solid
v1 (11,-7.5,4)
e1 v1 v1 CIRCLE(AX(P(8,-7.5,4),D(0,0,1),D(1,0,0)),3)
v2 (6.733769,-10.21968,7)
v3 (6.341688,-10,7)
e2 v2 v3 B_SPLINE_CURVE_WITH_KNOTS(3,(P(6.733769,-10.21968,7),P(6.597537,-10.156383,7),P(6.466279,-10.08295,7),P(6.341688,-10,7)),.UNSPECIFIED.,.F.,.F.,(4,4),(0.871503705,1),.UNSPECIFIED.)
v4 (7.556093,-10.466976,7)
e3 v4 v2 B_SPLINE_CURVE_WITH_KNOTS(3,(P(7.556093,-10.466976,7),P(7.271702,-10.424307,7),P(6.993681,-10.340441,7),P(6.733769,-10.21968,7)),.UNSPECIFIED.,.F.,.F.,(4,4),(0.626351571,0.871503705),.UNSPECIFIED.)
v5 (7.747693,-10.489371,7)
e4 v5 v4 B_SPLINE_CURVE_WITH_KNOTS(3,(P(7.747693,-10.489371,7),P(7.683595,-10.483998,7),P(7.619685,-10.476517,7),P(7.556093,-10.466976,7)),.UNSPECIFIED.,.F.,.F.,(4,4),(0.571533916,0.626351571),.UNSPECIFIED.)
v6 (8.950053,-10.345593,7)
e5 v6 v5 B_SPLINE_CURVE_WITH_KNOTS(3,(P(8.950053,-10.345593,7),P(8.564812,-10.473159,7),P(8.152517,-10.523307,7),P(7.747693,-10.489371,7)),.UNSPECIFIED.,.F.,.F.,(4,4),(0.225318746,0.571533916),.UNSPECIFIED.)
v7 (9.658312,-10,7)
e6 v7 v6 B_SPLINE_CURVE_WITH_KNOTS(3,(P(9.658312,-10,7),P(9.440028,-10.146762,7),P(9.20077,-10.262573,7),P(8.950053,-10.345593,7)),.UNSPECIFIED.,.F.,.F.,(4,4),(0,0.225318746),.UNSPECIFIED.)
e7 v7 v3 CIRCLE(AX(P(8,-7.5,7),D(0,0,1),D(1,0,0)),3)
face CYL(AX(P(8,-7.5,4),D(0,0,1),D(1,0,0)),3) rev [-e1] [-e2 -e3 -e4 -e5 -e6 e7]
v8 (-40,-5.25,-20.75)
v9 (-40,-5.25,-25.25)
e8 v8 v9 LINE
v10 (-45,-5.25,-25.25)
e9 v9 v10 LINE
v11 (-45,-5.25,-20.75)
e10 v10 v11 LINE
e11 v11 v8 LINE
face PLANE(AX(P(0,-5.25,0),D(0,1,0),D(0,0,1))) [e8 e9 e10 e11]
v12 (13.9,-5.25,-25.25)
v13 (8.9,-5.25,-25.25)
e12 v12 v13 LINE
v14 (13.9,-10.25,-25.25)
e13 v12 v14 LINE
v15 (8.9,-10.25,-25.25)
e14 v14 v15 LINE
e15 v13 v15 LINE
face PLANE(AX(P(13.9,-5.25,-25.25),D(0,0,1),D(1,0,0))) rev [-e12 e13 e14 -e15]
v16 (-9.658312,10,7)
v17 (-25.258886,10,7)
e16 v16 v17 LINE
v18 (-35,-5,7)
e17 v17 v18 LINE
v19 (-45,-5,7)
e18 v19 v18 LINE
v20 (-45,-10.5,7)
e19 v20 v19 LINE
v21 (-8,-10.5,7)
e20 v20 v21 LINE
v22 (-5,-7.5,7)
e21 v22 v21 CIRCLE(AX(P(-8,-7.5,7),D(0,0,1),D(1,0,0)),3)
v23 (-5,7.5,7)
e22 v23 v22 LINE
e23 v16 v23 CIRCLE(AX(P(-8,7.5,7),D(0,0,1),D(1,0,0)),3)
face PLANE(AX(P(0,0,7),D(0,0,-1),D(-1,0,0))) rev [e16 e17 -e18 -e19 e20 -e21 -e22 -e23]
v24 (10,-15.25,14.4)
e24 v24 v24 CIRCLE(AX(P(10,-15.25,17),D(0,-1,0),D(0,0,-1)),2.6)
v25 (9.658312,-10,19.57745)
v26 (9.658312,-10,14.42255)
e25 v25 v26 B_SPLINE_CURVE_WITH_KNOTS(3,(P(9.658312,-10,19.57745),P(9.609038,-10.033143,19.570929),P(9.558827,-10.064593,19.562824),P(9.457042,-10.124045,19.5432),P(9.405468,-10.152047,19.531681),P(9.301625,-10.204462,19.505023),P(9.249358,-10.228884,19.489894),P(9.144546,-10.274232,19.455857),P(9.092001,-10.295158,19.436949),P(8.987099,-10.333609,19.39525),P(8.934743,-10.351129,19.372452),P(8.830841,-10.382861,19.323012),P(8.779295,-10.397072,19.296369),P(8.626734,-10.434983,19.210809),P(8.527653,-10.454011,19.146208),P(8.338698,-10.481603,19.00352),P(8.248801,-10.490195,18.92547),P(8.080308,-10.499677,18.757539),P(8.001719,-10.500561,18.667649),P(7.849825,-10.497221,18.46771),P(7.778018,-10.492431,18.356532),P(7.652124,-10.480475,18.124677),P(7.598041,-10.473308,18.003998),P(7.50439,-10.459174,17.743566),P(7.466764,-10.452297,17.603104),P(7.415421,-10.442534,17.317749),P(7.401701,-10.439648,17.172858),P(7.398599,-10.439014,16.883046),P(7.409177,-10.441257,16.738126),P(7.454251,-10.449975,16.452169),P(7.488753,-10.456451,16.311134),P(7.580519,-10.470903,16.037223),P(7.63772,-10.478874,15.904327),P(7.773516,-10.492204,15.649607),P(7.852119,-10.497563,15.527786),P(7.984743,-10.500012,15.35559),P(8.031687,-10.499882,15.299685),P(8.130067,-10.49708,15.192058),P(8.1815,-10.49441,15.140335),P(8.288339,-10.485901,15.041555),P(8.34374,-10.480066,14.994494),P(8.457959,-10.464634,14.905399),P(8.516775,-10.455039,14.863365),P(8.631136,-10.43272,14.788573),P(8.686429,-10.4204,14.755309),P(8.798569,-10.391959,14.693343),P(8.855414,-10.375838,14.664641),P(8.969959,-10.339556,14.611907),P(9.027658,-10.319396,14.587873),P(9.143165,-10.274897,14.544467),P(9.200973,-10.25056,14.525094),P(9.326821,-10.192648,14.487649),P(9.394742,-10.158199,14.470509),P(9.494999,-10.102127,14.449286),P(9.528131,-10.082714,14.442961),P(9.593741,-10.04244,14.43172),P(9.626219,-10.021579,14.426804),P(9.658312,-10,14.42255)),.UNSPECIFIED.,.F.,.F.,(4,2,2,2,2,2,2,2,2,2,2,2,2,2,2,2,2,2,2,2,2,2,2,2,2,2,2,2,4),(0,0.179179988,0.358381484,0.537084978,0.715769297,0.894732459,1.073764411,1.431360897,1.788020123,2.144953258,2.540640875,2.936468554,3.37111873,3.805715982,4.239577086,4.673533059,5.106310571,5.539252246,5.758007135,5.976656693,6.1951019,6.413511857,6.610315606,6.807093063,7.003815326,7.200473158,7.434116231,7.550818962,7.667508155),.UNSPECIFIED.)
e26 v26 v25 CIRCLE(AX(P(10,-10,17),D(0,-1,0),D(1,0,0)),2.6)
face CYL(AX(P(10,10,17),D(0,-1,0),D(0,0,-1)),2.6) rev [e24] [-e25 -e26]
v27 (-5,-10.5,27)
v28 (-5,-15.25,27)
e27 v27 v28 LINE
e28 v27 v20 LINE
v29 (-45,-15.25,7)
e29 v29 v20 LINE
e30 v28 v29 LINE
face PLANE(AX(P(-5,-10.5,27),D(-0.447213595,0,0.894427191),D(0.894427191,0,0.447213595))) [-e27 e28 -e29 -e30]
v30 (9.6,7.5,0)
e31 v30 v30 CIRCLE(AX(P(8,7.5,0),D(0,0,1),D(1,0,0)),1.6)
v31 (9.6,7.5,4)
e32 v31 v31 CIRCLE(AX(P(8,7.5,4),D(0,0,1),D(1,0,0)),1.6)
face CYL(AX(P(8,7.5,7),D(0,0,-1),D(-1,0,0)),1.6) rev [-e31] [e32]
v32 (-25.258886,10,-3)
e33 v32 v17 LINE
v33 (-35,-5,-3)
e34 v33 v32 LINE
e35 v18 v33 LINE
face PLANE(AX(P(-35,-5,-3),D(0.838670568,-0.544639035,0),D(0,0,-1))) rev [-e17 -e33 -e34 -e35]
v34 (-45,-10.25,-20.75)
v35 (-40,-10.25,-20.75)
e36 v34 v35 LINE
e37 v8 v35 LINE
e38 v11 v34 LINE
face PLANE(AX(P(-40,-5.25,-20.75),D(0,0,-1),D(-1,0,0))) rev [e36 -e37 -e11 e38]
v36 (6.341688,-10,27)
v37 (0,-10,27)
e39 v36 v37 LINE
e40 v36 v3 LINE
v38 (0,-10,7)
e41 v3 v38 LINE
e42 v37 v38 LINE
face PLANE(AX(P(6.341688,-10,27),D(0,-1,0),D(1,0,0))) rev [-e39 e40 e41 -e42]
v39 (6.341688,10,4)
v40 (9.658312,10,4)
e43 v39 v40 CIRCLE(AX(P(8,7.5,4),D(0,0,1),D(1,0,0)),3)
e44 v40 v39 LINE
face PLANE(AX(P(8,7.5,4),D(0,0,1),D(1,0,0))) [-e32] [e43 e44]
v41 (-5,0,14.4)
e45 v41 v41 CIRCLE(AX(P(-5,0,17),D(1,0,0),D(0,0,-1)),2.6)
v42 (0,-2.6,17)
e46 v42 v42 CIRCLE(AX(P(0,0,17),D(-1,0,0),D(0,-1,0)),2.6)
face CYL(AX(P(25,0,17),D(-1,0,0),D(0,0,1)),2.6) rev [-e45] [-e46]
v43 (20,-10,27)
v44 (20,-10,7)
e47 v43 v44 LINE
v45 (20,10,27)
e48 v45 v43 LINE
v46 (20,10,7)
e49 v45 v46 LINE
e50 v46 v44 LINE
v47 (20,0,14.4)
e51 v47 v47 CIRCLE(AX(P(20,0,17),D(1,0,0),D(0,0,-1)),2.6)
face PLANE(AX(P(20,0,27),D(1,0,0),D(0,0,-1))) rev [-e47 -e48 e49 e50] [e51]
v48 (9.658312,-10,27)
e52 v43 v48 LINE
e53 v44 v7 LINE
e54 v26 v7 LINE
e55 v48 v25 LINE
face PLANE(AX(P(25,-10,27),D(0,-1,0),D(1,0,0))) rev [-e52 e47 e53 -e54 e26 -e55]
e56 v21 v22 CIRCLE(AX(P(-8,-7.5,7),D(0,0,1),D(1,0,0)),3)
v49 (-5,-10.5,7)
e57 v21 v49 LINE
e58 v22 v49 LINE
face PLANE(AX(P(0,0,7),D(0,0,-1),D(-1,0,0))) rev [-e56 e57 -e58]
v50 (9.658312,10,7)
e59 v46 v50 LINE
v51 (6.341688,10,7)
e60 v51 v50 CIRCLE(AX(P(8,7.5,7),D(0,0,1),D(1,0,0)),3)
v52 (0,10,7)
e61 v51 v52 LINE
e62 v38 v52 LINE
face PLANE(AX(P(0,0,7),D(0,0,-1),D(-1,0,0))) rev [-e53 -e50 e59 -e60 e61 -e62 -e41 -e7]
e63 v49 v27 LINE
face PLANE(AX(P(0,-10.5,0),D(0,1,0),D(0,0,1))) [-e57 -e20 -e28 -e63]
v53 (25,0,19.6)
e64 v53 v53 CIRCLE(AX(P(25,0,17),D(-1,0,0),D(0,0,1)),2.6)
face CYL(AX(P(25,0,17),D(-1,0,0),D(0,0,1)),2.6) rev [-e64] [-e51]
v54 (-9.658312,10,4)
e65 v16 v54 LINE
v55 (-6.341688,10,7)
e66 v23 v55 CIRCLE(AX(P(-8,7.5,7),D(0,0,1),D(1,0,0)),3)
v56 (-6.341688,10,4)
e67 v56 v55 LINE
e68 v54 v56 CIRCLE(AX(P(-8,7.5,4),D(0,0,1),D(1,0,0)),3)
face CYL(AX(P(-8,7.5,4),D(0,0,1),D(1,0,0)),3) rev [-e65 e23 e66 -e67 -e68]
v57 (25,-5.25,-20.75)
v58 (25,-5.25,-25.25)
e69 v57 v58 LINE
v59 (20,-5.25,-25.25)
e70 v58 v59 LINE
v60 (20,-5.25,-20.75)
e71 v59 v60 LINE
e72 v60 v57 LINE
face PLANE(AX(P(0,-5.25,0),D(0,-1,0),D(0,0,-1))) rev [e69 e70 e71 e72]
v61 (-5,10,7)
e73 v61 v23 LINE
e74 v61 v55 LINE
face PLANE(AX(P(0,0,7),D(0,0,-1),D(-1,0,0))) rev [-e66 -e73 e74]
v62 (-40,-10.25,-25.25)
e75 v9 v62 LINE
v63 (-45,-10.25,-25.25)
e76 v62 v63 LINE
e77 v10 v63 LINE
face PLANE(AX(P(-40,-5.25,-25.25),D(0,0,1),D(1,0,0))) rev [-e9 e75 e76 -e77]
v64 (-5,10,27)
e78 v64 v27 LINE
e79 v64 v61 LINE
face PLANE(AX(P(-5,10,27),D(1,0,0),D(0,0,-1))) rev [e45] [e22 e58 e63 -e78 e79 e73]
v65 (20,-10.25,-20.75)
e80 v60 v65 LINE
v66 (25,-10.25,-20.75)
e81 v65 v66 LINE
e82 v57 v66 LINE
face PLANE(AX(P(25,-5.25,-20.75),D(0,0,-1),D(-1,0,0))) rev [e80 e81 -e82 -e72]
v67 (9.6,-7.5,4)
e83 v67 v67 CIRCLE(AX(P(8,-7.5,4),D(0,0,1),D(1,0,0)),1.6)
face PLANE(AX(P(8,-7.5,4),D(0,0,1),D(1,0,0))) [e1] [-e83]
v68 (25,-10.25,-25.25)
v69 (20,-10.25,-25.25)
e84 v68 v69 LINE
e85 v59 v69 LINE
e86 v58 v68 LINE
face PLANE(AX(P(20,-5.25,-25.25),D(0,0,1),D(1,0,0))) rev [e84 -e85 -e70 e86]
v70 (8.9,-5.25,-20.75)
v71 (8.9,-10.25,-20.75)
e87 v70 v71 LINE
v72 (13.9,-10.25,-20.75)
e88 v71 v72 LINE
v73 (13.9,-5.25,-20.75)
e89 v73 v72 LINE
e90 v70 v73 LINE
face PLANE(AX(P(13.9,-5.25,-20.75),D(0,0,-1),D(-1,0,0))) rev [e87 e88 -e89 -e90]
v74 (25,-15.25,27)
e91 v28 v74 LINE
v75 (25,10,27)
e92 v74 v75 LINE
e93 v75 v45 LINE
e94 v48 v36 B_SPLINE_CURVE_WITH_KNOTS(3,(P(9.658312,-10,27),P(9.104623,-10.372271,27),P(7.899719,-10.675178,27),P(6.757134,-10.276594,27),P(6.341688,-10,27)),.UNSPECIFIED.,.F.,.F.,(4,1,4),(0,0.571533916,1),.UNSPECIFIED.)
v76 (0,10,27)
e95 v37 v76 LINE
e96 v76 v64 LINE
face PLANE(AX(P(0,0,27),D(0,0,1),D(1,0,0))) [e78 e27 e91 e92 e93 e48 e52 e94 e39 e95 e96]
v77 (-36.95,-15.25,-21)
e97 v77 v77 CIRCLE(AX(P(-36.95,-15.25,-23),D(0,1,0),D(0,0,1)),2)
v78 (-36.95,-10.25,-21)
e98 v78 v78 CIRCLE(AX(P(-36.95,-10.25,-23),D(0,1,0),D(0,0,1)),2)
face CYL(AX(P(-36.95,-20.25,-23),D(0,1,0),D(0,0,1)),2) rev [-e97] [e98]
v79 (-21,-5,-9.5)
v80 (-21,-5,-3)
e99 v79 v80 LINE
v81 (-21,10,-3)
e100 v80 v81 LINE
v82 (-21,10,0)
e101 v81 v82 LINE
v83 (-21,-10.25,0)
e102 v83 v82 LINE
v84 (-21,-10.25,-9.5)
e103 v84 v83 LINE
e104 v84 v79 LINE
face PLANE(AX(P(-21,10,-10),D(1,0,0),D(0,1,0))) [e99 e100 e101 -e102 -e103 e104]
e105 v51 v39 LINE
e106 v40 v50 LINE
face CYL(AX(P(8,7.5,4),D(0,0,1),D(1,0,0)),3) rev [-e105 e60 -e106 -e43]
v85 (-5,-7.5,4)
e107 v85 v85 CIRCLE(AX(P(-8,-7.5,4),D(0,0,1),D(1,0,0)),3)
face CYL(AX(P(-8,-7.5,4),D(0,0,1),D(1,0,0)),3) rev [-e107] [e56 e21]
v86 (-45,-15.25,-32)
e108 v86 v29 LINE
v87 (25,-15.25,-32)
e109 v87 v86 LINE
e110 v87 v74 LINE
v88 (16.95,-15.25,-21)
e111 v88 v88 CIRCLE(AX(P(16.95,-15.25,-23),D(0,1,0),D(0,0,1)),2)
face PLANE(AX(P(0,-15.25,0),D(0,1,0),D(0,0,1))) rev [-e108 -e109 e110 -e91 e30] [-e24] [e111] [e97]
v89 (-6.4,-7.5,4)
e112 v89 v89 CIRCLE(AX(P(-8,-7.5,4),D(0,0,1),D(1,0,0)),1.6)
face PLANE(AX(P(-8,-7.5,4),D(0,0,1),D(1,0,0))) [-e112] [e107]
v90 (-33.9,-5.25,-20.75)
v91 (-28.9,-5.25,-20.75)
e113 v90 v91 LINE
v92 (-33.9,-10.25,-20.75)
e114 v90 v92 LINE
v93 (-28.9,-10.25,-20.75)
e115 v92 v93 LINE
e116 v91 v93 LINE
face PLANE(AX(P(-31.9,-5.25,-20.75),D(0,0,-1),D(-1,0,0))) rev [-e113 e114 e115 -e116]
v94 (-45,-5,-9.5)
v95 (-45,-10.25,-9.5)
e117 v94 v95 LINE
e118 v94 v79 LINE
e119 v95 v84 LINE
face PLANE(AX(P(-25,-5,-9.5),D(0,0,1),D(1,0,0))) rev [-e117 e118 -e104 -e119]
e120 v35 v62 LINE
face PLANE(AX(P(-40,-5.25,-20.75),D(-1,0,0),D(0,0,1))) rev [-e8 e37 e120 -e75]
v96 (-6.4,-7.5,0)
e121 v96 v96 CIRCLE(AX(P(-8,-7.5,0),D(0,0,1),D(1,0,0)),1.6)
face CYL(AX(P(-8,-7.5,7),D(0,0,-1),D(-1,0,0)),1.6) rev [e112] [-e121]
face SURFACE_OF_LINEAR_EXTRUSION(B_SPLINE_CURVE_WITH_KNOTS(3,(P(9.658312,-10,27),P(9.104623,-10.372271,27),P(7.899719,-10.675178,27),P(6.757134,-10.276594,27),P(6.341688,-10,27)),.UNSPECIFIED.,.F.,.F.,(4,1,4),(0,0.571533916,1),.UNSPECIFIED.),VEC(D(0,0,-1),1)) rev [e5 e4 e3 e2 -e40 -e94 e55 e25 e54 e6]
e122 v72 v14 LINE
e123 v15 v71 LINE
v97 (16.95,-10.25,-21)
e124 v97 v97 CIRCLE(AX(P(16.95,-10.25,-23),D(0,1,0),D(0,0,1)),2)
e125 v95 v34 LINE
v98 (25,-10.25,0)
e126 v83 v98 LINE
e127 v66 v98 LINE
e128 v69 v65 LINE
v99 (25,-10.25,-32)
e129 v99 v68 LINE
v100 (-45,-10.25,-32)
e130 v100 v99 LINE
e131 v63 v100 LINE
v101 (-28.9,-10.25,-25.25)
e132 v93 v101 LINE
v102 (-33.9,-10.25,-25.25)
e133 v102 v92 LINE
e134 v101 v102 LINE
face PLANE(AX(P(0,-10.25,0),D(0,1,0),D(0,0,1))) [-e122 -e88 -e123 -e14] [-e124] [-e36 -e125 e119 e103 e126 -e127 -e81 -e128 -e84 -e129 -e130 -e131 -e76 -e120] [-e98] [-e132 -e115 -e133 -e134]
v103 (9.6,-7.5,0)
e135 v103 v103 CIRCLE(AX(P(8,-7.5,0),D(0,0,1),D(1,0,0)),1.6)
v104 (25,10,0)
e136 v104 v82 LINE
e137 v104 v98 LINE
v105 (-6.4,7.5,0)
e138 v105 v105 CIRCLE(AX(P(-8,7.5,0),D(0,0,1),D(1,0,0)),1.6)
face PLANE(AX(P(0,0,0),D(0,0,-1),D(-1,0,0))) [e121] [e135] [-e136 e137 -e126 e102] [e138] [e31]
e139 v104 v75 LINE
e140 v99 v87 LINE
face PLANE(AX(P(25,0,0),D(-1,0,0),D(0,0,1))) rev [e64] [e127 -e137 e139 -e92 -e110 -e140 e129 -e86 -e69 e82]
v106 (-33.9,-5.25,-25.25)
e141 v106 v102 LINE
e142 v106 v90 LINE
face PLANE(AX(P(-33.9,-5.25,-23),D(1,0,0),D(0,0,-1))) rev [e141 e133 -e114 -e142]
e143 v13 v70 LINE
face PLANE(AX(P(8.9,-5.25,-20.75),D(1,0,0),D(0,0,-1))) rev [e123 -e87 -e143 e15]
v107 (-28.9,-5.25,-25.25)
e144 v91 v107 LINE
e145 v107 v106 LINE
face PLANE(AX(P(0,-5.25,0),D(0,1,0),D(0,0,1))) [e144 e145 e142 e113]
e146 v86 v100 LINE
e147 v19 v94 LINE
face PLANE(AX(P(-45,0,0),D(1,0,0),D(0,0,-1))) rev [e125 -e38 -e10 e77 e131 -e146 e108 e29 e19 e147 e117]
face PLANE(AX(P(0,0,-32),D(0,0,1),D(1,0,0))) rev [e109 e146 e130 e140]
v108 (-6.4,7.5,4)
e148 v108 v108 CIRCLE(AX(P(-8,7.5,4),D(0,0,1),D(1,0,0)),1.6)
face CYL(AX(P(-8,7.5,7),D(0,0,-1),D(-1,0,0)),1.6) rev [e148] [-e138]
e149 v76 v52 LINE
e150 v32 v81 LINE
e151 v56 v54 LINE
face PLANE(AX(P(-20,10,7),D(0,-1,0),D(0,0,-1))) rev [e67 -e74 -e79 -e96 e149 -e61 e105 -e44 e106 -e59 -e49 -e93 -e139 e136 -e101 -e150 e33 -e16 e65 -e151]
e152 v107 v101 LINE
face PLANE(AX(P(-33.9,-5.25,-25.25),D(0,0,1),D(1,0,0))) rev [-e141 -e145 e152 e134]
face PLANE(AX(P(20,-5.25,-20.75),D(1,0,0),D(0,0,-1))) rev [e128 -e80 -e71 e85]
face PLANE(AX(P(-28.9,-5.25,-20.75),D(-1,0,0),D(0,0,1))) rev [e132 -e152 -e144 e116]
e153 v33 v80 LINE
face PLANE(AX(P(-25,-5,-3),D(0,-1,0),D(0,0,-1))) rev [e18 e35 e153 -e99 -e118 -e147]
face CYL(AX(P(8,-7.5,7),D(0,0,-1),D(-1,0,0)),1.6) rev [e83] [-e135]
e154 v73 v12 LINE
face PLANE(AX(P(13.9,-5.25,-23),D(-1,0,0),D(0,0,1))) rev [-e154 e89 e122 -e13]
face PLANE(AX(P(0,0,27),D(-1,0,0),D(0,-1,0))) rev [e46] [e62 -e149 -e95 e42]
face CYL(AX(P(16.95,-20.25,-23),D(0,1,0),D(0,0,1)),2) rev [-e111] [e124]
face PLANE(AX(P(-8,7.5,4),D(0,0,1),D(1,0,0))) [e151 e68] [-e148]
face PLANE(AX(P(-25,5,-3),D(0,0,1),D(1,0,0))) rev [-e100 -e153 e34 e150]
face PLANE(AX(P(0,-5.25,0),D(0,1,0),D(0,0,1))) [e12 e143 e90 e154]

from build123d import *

# Parameters (mm, degrees)
SKETCH1_W            = 40
SKETCH1_H            = 20
SKETCH1_R            = 1.6
BOSS_EXTRUDE1_DEPTH  = 7
BOSS_EXTRUDE2_DEPTH  = 5
BOSS_EXTRUDE3_DEPTH  = 5
BOSS_EXTRUDE4_DEPTH  = 0.25
SKETCH5_W            = 50
SKETCH5_H            = 36
BOSS_EXTRUDE5_DEPTH  = 5
SKETCH6_R            = 3
CUT_EXTRUDE1_DEPTH   = 3
BOSS_EXTRUDE6_DEPTH  = 20
BOSS_EXTRUDE8_DEPTH  = 20
SKETCH10_R           = 2.6
CUT_EXTRUDE2_DEPTH   = 60.779281528
BOSS_EXTRUDE9_DEPTH  = 20
SKETCH12_R           = 2.6
CUT_EXTRUDE3_DEPTH   = 60.190898836
SKETCH13_W           = 5
SKETCH13_H           = 5
CUT_EXTRUDE4_DEPTH   = 6.5
CHAMFER1_SIZE        = 15.398649638
CHAMFER1_SIZE_2      = 10
SKETCH14_W           = 1
SKETCH14_H           = 20.25
CUT_EXTRUDE5_DEPTH   = 10
SKETCH16_W           = 4
SKETCH16_H           = 20.25
CUT_EXTRUDE7_DEPTH   = 10
BOSS_EXTRUDE10_DEPTH = 4.75
SKETCH18_W           = 70
SKETCH18_H           = 5
BOSS_EXTRUDE11_DEPTH = 3
BOSS_EXTRUDE7_DEPTH  = 5
SKETCH15_R           = 2
CUT_EXTRUDE6_DEPTH   = 10


with BuildPart() as part:
    # Sketch1 → Boss-Extrude1 (new body)
    with BuildSketch(Plane.XY):
        Rectangle(SKETCH1_W, SKETCH1_H)
        with Locations((-8, 7.5)):
            Circle(SKETCH1_R, mode=Mode.SUBTRACT)
        with Locations((8, 7.5)):
            Circle(SKETCH1_R, mode=Mode.SUBTRACT)
        with Locations((8, -7.5)):
            Circle(SKETCH1_R, mode=Mode.SUBTRACT)
        with Locations((-8, -7.5)):
            Circle(SKETCH1_R, mode=Mode.SUBTRACT)
    extrude(amount=BOSS_EXTRUDE1_DEPTH)

    # Sketch2 → Boss-Extrude2 (add)
    with BuildSketch(Plane(origin=(20, 0, 0), x_dir=(0, 0, -1), z_dir=(1, 0, 0))):
        Polygon((3, -5), (3, 5), (9.5, 5), (9.5, 10), (0, 10), (-7, 10), (-7, -10), (0, -10), (9.5, -10), (9.5, -5), align=None)
    extrude(amount=BOSS_EXTRUDE2_DEPTH)

    # Sketch3 → Boss-Extrude3 (add)
    with BuildSketch(Plane.ZY.offset(20)):
        Polygon((7, 10), (-9.5, 10), (-9.5, 5), (-3, 5), (-3, -5), (-9.5, -5), (-9.5, -10), (7, -10), align=None)
    extrude(amount=BOSS_EXTRUDE3_DEPTH)

    # Sketch4 → Boss-Extrude4 (add)
    with BuildSketch(Plane.XZ.offset(10)):
        Polygon((-25, 7), (-25, -9.5), (-20, -9.5), (-20, 0), (20, 0), (20, -9.5), (25, -9.5), (25, 7), align=None)
    extrude(amount=BOSS_EXTRUDE4_DEPTH)

    # Sketch5 → Boss-Extrude5 (add)
    with BuildSketch(Plane.XZ.offset(10.25)):
        with Locations((0, -11)):
            Rectangle(SKETCH5_W, SKETCH5_H)
    extrude(amount=BOSS_EXTRUDE5_DEPTH)

    # Sketch6 → Cut-Extrude1 (cut)
    with BuildSketch(Plane.XY.offset(7)):
        with Locations((-8, 7.5)):
            Circle(SKETCH6_R)
        with Locations((-8, -7.5)):
            Circle(SKETCH6_R)
        with Locations((8, -7.5)):
            Circle(SKETCH6_R)
        with Locations((8, 7.5)):
            Circle(SKETCH6_R)
    extrude(amount=-CUT_EXTRUDE1_DEPTH, mode=Mode.SUBTRACT)

    # Sketch7 → Boss-Extrude6 (add)
    with BuildSketch(Plane.ZY.offset(25)):
        Polygon((-3, -5), (7, -5), (7, -15.25), (-29, -15.25), (-29, -10.25), (-9.5, -10.25), (-9.5, -5), align=None)
    extrude(amount=BOSS_EXTRUDE6_DEPTH)

    # Sketch9 → Boss-Extrude8 (add)
    with BuildSketch(Plane.XY.offset(7)):
        Polygon((0, 0), (0, 10), (-5, 10), (-5, -10), (0, -10), align=None)
        Polygon((20, 0), (20, 10), (25, 10), (25, -10), (20, -10), align=None)
    extrude(amount=BOSS_EXTRUDE8_DEPTH)

    # Sketch10 → Cut-Extrude2 (cut, through all)
    with BuildSketch(Plane.ZY.offset(25)):
        with Locations(Location((17, 0, 0), (0, 0, 270))):
            Circle(SKETCH10_R)
    extrude(amount=-CUT_EXTRUDE2_DEPTH, mode=Mode.SUBTRACT)

    # Sketch11 → Boss-Extrude9 (add, through all)
    with BuildSketch(Plane.XY.offset(7)):
        with BuildLine():
            Line((25, -15.25), (25, -10))
            Line((25, -10), (10, -10))
            Line((10, -10), (9.658312395, -10))
            add(Edge.make_bspline(
                [(9.658312395, -10), (9.104622692, -10.372271133), (7.89971927, -10.67517784), (6.757134286, -10.276593696), (6.341687605, -10)],
                knots=[0, 0, 0, 0, 0.571533916, 1, 1, 1, 1], degree=3))
            Line((6.341687605, -10), (-5, -10))
            Line((-5, -10), (-5, -15.25))
            Line((-5, -15.25), (25, -15.25))
        make_face()
    extrude(amount=BOSS_EXTRUDE9_DEPTH)

    # Sketch12 → Cut-Extrude3 (cut, through all)
    with BuildSketch(Plane.XZ.offset(15.25)):
        with Locations(Location((10, 17, 0), (0, 0, 270))):
            Circle(SKETCH12_R)
    extrude(amount=-CUT_EXTRUDE3_DEPTH, mode=Mode.SUBTRACT)

    # Sketch13 → Cut-Extrude4 (cut)
    with BuildSketch(Plane(origin=(0, 0, -9.5), x_dir=(-1, 0, 0), z_dir=(0, 0, -1))):
        with Locations((22.5, 7.5)):
            Rectangle(SKETCH13_W, SKETCH13_H)
        with Locations((-22.5, 7.5)):
            Rectangle(SKETCH13_W, SKETCH13_H)
    extrude(amount=-CUT_EXTRUDE4_DEPTH, mode=Mode.SUBTRACT)

    # Chamfer1
    # the kernel refuses this chamfer: 15.398649638, 10 mm, written as the material it adds along each edge
    with BuildSketch(Plane(origin=(-25, -5, 7), x_dir=(0.021073765466273167, 0.9997779235455604, 0), z_dir=(0, 0, -1))) as chamfer1_piece_1_section:
        Polygon((CHAMFER1_SIZE * 0.999777923555, -CHAMFER1_SIZE * 0.0210737654665), (-CHAMFER1_SIZE_2 * 0.0210737654663, -CHAMFER1_SIZE_2 * 0.999777923546), (0, 0), align=None)
    chamfer1_piece_1 = extrude(amount=10, mode=Mode.PRIVATE)
    chamfer1_piece_1 = split(chamfer1_piece_1, bisect_by=Plane(origin=(-28.252881362, 10, 2), z_dir=(0, -1, 0)), keep=Keep.TOP, mode=Mode.PRIVATE)
    add(chamfer1_piece_1)

    # Sketch14 → Cut-Extrude5 (cut)
    with BuildSketch(Plane(origin=(0, 0, 0), x_dir=(-1, 0, 0), z_dir=(0, 0, -1))):
        with Locations((20.5, -0.125)):
            Rectangle(SKETCH14_W, SKETCH14_H)
        with Locations((-20.5, -0.125)):
            Rectangle(SKETCH14_W, SKETCH14_H)
    extrude(amount=CUT_EXTRUDE5_DEPTH, mode=Mode.SUBTRACT)

    # Sketch16 → Cut-Extrude7 (cut)
    with BuildSketch(Plane(origin=(0, 0, 0), x_dir=(-1, 0, 0), z_dir=(0, 0, -1))):
        with Locations((-23, -0.125)):
            Rectangle(SKETCH16_W, SKETCH16_H)
    extrude(amount=CUT_EXTRUDE7_DEPTH, mode=Mode.SUBTRACT)

    # Sketch17 → Boss-Extrude10 (add)
    with BuildSketch(Plane.XZ.offset(15.25)):
        Polygon((-5, 27), (-45, 7), (-5, 7), align=None)
    extrude(amount=-BOSS_EXTRUDE10_DEPTH)

    # Sketch18 → Boss-Extrude11 (add)
    with BuildSketch(Plane(origin=(0, 0, -29), x_dir=(-1, 0, 0), z_dir=(0, 0, -1))):
        with Locations((10, -12.75)):
            Rectangle(SKETCH18_W, SKETCH18_H)
    extrude(amount=BOSS_EXTRUDE11_DEPTH)

    # Sketch8 → Boss-Extrude7 (add)
    with BuildSketch(Plane(origin=(0, -10.25, 0), x_dir=(1, 0, 0), z_dir=(0, 1, 0))):
        Polygon((20, 20.75), (20, 25.25), (25, 25.25), (25, 20.75), (22, 20.75), align=None)
        Polygon((13.9, 23), (13.9, 20.75), (11.9, 20.75), (8.9, 20.75), (8.9, 25.25), (13.9, 25.25), align=None)
        Polygon((-28.9, 20.75), (-28.9, 25.25), (-33.9, 25.25), (-33.9, 23), (-33.9, 20.75), (-31.9, 20.75), align=None)
        Polygon((-45, 20.75), (-42, 20.75), (-40, 20.75), (-40, 25.25), (-45, 25.25), align=None)
    extrude(amount=BOSS_EXTRUDE7_DEPTH)

    # Sketch15 → Cut-Extrude6 (cut)
    with BuildSketch(Plane(origin=(0, -10.25, 0), x_dir=(1, 0, 0), z_dir=(0, 1, 0))):
        with Locations(Location((16.95, 23, 0), (0, 0, 270))):
            Circle(SKETCH15_R)
        with Locations(Location((-36.95, 23, 0), (0, 0, 270))):
            Circle(SKETCH15_R)
    extrude(amount=-CUT_EXTRUDE6_DEPTH, mode=Mode.SUBTRACT)


solid = part.part
